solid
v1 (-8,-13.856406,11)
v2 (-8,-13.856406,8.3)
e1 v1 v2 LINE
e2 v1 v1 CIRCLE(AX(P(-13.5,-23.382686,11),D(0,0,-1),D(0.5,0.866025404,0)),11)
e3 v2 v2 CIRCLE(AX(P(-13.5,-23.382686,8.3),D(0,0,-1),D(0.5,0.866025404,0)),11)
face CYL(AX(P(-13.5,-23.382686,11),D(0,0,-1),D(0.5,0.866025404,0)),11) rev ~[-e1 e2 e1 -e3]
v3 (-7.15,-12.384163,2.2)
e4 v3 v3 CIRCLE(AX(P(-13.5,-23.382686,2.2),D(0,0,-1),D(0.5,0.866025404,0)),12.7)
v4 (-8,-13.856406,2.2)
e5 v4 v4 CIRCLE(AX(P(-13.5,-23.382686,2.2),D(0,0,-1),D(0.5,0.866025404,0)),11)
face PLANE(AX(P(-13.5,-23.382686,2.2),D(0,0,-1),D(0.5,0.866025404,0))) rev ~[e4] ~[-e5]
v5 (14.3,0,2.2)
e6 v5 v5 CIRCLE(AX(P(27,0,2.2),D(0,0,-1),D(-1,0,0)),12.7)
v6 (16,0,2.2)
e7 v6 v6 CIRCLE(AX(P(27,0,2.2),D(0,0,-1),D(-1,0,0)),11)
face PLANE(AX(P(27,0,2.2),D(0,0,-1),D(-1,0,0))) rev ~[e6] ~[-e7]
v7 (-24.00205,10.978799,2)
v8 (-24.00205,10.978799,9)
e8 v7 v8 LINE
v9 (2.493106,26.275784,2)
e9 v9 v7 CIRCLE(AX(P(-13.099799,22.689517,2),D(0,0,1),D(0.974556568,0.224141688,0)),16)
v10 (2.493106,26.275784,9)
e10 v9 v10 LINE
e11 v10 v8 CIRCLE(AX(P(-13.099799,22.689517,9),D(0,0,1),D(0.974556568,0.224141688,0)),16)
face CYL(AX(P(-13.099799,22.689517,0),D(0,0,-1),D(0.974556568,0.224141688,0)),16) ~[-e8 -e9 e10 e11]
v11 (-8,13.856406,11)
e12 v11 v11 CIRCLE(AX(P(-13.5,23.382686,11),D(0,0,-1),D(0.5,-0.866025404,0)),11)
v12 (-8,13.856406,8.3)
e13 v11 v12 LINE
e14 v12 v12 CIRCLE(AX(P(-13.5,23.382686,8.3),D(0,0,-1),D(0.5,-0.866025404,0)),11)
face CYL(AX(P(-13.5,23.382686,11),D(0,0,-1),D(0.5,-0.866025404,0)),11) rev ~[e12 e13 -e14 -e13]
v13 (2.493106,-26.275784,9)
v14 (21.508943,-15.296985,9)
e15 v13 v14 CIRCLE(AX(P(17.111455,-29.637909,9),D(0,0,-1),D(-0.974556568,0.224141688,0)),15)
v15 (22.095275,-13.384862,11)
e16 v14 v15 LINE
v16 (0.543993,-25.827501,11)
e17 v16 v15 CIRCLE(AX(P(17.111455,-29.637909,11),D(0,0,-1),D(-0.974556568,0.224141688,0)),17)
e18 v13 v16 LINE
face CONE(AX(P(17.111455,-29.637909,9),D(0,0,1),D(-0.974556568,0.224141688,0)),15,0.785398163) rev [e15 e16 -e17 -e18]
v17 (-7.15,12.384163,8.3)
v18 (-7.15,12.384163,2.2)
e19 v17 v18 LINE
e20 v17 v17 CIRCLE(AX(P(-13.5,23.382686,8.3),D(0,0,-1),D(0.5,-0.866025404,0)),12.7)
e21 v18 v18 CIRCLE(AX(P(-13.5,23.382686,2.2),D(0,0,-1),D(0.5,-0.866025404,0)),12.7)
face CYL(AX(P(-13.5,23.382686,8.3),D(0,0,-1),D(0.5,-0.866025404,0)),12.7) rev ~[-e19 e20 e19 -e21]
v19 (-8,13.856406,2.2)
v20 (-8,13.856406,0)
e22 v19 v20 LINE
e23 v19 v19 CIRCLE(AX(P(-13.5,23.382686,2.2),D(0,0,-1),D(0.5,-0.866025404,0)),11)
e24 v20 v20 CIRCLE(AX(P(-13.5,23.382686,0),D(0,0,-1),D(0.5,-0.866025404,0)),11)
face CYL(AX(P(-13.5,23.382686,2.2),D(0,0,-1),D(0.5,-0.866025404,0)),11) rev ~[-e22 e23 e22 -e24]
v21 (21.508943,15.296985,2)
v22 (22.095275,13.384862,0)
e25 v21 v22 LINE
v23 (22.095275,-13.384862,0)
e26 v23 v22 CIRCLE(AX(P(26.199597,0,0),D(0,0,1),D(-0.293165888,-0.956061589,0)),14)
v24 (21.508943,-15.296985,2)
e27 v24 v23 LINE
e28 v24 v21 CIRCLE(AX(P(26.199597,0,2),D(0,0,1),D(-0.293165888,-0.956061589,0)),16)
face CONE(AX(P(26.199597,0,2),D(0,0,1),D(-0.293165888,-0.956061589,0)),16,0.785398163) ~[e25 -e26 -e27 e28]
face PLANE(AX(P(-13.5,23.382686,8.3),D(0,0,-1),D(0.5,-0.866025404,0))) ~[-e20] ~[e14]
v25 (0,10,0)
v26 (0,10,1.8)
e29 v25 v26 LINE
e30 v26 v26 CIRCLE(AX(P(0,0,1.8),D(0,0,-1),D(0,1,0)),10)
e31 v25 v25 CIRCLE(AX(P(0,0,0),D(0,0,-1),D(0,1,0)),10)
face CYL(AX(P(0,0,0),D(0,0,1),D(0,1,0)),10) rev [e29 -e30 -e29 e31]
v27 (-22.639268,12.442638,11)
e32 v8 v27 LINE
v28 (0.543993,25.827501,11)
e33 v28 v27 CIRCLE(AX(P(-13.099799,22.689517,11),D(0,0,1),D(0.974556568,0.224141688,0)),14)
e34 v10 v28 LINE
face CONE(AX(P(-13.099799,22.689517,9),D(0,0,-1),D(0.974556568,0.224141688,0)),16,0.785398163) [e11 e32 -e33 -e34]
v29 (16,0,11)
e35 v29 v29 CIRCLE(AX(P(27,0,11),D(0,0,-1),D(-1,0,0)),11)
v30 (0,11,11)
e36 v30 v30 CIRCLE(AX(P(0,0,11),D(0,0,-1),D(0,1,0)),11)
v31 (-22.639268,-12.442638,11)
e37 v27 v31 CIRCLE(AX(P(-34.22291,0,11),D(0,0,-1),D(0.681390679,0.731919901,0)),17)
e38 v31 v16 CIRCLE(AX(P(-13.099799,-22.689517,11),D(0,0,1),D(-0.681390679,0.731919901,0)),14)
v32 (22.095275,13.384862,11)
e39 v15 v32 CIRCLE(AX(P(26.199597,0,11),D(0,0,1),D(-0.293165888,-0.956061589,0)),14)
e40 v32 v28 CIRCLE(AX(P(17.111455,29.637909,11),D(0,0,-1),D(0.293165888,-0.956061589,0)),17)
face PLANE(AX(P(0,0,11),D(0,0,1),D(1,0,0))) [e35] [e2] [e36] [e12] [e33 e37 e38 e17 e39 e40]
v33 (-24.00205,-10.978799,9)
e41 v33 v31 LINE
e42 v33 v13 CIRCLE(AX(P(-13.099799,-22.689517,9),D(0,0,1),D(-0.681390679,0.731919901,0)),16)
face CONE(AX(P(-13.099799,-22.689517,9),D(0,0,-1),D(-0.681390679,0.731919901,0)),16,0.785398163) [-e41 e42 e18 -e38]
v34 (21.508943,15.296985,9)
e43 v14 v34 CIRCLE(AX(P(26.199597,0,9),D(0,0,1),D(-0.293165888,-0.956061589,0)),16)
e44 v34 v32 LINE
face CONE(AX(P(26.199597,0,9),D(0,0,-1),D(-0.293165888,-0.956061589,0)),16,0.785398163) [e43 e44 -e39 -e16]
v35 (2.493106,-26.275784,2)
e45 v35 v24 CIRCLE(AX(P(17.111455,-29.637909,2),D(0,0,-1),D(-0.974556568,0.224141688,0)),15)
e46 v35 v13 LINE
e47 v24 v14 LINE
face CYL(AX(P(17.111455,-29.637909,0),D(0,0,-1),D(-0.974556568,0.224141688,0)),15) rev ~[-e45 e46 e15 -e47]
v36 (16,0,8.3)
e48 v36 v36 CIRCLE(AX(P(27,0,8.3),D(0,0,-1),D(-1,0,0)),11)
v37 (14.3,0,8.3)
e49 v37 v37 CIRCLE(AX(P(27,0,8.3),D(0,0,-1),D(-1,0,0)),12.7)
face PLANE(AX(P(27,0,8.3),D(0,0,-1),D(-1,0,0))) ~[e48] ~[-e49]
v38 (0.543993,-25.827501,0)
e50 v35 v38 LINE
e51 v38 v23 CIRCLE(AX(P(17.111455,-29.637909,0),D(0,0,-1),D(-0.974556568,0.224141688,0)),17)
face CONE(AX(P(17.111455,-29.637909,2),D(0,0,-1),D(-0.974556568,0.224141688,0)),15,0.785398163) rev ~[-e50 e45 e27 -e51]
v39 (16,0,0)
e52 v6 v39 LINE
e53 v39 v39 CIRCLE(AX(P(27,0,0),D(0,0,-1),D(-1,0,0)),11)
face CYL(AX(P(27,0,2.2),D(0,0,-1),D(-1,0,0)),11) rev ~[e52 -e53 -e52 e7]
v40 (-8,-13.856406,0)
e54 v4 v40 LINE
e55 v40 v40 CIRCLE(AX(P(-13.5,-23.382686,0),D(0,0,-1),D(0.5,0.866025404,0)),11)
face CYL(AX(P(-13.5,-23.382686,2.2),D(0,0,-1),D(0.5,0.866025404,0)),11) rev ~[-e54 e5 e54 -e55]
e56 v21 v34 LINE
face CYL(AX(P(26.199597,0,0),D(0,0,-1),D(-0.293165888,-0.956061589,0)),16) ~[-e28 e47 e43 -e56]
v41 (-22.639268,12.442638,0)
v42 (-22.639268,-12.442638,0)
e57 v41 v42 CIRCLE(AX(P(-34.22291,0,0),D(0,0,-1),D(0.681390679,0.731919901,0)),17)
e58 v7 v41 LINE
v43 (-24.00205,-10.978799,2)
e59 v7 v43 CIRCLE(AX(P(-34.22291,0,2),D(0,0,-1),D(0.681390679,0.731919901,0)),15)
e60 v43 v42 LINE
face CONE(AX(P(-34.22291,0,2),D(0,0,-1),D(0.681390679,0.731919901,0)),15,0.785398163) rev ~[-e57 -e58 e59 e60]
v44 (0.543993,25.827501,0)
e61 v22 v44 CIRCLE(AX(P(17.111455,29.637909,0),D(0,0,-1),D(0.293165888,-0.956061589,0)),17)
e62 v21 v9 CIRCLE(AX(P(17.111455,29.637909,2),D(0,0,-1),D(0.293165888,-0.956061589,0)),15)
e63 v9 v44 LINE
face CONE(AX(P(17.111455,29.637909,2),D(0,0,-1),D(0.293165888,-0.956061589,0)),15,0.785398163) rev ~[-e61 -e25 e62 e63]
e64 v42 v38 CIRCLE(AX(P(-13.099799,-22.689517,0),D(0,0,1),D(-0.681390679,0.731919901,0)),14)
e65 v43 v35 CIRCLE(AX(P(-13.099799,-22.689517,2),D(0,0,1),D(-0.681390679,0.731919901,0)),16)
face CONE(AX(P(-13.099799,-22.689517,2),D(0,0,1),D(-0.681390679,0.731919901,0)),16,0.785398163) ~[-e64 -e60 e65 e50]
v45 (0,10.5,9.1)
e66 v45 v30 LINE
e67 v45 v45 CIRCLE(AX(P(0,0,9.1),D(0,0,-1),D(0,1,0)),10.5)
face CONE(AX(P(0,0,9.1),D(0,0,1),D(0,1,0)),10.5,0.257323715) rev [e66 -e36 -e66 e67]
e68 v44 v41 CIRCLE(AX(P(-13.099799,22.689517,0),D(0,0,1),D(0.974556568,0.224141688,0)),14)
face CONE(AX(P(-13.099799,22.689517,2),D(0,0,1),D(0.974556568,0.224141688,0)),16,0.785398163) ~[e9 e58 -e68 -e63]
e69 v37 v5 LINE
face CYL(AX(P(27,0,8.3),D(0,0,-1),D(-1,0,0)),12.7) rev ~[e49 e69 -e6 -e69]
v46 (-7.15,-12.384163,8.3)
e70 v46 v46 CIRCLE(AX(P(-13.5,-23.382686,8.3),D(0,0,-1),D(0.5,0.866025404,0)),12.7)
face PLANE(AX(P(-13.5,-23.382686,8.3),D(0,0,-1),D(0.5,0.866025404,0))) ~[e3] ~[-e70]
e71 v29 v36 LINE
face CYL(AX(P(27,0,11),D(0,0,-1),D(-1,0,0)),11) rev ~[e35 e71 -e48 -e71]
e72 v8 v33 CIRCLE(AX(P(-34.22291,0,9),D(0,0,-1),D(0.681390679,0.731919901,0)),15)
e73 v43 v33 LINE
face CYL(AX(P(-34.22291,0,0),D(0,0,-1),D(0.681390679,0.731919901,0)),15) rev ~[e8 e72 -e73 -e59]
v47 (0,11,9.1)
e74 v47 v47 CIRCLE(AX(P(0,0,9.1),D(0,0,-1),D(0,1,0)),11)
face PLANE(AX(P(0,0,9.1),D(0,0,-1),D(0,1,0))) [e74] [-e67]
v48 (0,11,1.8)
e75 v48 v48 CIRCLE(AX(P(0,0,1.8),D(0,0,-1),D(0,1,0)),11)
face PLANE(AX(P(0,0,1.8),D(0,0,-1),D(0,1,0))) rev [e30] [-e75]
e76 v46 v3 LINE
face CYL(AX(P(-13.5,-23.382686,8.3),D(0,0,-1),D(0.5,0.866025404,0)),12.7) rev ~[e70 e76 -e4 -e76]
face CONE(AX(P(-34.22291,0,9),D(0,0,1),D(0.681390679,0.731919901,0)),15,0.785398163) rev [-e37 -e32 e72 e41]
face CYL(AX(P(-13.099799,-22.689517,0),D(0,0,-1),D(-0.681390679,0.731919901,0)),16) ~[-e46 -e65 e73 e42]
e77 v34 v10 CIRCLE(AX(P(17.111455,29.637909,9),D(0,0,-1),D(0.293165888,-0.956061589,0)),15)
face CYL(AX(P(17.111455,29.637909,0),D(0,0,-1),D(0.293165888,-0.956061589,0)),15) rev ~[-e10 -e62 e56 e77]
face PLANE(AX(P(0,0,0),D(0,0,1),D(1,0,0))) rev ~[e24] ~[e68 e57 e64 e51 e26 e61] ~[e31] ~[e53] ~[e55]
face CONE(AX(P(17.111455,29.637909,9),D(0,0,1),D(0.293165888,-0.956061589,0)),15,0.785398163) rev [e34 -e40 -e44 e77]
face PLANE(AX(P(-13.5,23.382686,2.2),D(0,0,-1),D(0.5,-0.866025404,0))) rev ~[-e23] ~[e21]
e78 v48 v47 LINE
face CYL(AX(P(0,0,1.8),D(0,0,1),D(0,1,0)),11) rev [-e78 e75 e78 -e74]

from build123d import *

# Parameters (mm, degrees)
F1_DEPTH        = 11
F5_COPIES_COUNT = 3
F6_SIZE         = 2
F7_SIZE         = 2


# Not quite as in the source:
# - a pattern or mirror of a feature is missing from the dataset's text; its kind, count and spacing are read off the source's solid


with BuildPart() as f1:
    # F0 (on Top) → F1 (new body)
    with BuildSketch(Plane.XY):
        with BuildLine():
            ThreePointArc((2.4931063701, -26.2757839441), (9.6114548877, -16.6475282001), (21.5089432149, -15.2969854229))
            ThreePointArc((21.5089432149, -15.2969854229), (42.1995974306, 0), (21.5089432149, 15.2969854229))
            ThreePointArc((21.5089432149, 15.2969854229), (9.6114548877, 16.6475282001), (2.4931063701, 26.2757839441))
            ThreePointArc((2.4931063701, 26.2757839441), (-21.0997987153, 36.5459234044), (-24.002049585, 10.9787985212))
            ThreePointArc((-24.002049585, 10.9787985212), (-19.2229097754, 0), (-24.002049585, -10.9787985212))
            ThreePointArc((-24.002049585, -10.9787985212), (-21.0997987153, -36.5459234044), (2.4931063701, -26.2757839441))
        make_face()
    extrude(amount=F1_DEPTH)

    # F2 (on Right) → F3 (revolve, cut)
    with BuildSketch(Plane.YZ):
        Polygon((0, 11), (0, 0), (10, 0), (10, 1.8), (11, 1.8), (11, 9.1), (10.5, 9.1), (11, 11), align=None)
    revolve(axis=Axis((0, 0, 3.7751235068), (0, 0, -1)), mode=Mode.SUBTRACT)

    # F4 (on Front) → F5 (revolve, cut)
    with BuildSketch(Plane.XZ):
        Polygon((16, 0), (27, 0), (27, 11), (16, 11), (16, 8.3), (14.3, 8.3), (14.3, 2.2), (16, 2.2), align=None)
    f5 = revolve(axis=Axis((27, 0, 6.29213918), (0, 0, -1)), mode=Mode.SUBTRACT)

    # F5_copies: F5 ×3 about axis
    f5_copies_axis = Axis((0, 0, 0), (0, 0, 1))
    for i in range(1, F5_COPIES_COUNT):
        add(f5.rotate(f5_copies_axis, i * 360 / F5_COPIES_COUNT), mode=Mode.SUBTRACT)

    # F6
    f6_edges = [f1.edges().sort_by_distance(p)[0] for p in [
        (9.611455, -16.647528, 11),
    ]]
    chamfer(f6_edges, length=F6_SIZE)

    # F7
    f7_edges = [f1.edges().sort_by_distance(p)[0] for p in [
        (9.611455, -16.647528, 0),
        (-21.099799, -36.545923, 0),
        (-19.22291, 0, 0),
        (-21.099799, 36.545923, 0),
        (42.199597, 0, 0),
        (9.611455, 16.647528, 0),
    ]]
    chamfer(f7_edges, length=F7_SIZE)


solid = f1.part
